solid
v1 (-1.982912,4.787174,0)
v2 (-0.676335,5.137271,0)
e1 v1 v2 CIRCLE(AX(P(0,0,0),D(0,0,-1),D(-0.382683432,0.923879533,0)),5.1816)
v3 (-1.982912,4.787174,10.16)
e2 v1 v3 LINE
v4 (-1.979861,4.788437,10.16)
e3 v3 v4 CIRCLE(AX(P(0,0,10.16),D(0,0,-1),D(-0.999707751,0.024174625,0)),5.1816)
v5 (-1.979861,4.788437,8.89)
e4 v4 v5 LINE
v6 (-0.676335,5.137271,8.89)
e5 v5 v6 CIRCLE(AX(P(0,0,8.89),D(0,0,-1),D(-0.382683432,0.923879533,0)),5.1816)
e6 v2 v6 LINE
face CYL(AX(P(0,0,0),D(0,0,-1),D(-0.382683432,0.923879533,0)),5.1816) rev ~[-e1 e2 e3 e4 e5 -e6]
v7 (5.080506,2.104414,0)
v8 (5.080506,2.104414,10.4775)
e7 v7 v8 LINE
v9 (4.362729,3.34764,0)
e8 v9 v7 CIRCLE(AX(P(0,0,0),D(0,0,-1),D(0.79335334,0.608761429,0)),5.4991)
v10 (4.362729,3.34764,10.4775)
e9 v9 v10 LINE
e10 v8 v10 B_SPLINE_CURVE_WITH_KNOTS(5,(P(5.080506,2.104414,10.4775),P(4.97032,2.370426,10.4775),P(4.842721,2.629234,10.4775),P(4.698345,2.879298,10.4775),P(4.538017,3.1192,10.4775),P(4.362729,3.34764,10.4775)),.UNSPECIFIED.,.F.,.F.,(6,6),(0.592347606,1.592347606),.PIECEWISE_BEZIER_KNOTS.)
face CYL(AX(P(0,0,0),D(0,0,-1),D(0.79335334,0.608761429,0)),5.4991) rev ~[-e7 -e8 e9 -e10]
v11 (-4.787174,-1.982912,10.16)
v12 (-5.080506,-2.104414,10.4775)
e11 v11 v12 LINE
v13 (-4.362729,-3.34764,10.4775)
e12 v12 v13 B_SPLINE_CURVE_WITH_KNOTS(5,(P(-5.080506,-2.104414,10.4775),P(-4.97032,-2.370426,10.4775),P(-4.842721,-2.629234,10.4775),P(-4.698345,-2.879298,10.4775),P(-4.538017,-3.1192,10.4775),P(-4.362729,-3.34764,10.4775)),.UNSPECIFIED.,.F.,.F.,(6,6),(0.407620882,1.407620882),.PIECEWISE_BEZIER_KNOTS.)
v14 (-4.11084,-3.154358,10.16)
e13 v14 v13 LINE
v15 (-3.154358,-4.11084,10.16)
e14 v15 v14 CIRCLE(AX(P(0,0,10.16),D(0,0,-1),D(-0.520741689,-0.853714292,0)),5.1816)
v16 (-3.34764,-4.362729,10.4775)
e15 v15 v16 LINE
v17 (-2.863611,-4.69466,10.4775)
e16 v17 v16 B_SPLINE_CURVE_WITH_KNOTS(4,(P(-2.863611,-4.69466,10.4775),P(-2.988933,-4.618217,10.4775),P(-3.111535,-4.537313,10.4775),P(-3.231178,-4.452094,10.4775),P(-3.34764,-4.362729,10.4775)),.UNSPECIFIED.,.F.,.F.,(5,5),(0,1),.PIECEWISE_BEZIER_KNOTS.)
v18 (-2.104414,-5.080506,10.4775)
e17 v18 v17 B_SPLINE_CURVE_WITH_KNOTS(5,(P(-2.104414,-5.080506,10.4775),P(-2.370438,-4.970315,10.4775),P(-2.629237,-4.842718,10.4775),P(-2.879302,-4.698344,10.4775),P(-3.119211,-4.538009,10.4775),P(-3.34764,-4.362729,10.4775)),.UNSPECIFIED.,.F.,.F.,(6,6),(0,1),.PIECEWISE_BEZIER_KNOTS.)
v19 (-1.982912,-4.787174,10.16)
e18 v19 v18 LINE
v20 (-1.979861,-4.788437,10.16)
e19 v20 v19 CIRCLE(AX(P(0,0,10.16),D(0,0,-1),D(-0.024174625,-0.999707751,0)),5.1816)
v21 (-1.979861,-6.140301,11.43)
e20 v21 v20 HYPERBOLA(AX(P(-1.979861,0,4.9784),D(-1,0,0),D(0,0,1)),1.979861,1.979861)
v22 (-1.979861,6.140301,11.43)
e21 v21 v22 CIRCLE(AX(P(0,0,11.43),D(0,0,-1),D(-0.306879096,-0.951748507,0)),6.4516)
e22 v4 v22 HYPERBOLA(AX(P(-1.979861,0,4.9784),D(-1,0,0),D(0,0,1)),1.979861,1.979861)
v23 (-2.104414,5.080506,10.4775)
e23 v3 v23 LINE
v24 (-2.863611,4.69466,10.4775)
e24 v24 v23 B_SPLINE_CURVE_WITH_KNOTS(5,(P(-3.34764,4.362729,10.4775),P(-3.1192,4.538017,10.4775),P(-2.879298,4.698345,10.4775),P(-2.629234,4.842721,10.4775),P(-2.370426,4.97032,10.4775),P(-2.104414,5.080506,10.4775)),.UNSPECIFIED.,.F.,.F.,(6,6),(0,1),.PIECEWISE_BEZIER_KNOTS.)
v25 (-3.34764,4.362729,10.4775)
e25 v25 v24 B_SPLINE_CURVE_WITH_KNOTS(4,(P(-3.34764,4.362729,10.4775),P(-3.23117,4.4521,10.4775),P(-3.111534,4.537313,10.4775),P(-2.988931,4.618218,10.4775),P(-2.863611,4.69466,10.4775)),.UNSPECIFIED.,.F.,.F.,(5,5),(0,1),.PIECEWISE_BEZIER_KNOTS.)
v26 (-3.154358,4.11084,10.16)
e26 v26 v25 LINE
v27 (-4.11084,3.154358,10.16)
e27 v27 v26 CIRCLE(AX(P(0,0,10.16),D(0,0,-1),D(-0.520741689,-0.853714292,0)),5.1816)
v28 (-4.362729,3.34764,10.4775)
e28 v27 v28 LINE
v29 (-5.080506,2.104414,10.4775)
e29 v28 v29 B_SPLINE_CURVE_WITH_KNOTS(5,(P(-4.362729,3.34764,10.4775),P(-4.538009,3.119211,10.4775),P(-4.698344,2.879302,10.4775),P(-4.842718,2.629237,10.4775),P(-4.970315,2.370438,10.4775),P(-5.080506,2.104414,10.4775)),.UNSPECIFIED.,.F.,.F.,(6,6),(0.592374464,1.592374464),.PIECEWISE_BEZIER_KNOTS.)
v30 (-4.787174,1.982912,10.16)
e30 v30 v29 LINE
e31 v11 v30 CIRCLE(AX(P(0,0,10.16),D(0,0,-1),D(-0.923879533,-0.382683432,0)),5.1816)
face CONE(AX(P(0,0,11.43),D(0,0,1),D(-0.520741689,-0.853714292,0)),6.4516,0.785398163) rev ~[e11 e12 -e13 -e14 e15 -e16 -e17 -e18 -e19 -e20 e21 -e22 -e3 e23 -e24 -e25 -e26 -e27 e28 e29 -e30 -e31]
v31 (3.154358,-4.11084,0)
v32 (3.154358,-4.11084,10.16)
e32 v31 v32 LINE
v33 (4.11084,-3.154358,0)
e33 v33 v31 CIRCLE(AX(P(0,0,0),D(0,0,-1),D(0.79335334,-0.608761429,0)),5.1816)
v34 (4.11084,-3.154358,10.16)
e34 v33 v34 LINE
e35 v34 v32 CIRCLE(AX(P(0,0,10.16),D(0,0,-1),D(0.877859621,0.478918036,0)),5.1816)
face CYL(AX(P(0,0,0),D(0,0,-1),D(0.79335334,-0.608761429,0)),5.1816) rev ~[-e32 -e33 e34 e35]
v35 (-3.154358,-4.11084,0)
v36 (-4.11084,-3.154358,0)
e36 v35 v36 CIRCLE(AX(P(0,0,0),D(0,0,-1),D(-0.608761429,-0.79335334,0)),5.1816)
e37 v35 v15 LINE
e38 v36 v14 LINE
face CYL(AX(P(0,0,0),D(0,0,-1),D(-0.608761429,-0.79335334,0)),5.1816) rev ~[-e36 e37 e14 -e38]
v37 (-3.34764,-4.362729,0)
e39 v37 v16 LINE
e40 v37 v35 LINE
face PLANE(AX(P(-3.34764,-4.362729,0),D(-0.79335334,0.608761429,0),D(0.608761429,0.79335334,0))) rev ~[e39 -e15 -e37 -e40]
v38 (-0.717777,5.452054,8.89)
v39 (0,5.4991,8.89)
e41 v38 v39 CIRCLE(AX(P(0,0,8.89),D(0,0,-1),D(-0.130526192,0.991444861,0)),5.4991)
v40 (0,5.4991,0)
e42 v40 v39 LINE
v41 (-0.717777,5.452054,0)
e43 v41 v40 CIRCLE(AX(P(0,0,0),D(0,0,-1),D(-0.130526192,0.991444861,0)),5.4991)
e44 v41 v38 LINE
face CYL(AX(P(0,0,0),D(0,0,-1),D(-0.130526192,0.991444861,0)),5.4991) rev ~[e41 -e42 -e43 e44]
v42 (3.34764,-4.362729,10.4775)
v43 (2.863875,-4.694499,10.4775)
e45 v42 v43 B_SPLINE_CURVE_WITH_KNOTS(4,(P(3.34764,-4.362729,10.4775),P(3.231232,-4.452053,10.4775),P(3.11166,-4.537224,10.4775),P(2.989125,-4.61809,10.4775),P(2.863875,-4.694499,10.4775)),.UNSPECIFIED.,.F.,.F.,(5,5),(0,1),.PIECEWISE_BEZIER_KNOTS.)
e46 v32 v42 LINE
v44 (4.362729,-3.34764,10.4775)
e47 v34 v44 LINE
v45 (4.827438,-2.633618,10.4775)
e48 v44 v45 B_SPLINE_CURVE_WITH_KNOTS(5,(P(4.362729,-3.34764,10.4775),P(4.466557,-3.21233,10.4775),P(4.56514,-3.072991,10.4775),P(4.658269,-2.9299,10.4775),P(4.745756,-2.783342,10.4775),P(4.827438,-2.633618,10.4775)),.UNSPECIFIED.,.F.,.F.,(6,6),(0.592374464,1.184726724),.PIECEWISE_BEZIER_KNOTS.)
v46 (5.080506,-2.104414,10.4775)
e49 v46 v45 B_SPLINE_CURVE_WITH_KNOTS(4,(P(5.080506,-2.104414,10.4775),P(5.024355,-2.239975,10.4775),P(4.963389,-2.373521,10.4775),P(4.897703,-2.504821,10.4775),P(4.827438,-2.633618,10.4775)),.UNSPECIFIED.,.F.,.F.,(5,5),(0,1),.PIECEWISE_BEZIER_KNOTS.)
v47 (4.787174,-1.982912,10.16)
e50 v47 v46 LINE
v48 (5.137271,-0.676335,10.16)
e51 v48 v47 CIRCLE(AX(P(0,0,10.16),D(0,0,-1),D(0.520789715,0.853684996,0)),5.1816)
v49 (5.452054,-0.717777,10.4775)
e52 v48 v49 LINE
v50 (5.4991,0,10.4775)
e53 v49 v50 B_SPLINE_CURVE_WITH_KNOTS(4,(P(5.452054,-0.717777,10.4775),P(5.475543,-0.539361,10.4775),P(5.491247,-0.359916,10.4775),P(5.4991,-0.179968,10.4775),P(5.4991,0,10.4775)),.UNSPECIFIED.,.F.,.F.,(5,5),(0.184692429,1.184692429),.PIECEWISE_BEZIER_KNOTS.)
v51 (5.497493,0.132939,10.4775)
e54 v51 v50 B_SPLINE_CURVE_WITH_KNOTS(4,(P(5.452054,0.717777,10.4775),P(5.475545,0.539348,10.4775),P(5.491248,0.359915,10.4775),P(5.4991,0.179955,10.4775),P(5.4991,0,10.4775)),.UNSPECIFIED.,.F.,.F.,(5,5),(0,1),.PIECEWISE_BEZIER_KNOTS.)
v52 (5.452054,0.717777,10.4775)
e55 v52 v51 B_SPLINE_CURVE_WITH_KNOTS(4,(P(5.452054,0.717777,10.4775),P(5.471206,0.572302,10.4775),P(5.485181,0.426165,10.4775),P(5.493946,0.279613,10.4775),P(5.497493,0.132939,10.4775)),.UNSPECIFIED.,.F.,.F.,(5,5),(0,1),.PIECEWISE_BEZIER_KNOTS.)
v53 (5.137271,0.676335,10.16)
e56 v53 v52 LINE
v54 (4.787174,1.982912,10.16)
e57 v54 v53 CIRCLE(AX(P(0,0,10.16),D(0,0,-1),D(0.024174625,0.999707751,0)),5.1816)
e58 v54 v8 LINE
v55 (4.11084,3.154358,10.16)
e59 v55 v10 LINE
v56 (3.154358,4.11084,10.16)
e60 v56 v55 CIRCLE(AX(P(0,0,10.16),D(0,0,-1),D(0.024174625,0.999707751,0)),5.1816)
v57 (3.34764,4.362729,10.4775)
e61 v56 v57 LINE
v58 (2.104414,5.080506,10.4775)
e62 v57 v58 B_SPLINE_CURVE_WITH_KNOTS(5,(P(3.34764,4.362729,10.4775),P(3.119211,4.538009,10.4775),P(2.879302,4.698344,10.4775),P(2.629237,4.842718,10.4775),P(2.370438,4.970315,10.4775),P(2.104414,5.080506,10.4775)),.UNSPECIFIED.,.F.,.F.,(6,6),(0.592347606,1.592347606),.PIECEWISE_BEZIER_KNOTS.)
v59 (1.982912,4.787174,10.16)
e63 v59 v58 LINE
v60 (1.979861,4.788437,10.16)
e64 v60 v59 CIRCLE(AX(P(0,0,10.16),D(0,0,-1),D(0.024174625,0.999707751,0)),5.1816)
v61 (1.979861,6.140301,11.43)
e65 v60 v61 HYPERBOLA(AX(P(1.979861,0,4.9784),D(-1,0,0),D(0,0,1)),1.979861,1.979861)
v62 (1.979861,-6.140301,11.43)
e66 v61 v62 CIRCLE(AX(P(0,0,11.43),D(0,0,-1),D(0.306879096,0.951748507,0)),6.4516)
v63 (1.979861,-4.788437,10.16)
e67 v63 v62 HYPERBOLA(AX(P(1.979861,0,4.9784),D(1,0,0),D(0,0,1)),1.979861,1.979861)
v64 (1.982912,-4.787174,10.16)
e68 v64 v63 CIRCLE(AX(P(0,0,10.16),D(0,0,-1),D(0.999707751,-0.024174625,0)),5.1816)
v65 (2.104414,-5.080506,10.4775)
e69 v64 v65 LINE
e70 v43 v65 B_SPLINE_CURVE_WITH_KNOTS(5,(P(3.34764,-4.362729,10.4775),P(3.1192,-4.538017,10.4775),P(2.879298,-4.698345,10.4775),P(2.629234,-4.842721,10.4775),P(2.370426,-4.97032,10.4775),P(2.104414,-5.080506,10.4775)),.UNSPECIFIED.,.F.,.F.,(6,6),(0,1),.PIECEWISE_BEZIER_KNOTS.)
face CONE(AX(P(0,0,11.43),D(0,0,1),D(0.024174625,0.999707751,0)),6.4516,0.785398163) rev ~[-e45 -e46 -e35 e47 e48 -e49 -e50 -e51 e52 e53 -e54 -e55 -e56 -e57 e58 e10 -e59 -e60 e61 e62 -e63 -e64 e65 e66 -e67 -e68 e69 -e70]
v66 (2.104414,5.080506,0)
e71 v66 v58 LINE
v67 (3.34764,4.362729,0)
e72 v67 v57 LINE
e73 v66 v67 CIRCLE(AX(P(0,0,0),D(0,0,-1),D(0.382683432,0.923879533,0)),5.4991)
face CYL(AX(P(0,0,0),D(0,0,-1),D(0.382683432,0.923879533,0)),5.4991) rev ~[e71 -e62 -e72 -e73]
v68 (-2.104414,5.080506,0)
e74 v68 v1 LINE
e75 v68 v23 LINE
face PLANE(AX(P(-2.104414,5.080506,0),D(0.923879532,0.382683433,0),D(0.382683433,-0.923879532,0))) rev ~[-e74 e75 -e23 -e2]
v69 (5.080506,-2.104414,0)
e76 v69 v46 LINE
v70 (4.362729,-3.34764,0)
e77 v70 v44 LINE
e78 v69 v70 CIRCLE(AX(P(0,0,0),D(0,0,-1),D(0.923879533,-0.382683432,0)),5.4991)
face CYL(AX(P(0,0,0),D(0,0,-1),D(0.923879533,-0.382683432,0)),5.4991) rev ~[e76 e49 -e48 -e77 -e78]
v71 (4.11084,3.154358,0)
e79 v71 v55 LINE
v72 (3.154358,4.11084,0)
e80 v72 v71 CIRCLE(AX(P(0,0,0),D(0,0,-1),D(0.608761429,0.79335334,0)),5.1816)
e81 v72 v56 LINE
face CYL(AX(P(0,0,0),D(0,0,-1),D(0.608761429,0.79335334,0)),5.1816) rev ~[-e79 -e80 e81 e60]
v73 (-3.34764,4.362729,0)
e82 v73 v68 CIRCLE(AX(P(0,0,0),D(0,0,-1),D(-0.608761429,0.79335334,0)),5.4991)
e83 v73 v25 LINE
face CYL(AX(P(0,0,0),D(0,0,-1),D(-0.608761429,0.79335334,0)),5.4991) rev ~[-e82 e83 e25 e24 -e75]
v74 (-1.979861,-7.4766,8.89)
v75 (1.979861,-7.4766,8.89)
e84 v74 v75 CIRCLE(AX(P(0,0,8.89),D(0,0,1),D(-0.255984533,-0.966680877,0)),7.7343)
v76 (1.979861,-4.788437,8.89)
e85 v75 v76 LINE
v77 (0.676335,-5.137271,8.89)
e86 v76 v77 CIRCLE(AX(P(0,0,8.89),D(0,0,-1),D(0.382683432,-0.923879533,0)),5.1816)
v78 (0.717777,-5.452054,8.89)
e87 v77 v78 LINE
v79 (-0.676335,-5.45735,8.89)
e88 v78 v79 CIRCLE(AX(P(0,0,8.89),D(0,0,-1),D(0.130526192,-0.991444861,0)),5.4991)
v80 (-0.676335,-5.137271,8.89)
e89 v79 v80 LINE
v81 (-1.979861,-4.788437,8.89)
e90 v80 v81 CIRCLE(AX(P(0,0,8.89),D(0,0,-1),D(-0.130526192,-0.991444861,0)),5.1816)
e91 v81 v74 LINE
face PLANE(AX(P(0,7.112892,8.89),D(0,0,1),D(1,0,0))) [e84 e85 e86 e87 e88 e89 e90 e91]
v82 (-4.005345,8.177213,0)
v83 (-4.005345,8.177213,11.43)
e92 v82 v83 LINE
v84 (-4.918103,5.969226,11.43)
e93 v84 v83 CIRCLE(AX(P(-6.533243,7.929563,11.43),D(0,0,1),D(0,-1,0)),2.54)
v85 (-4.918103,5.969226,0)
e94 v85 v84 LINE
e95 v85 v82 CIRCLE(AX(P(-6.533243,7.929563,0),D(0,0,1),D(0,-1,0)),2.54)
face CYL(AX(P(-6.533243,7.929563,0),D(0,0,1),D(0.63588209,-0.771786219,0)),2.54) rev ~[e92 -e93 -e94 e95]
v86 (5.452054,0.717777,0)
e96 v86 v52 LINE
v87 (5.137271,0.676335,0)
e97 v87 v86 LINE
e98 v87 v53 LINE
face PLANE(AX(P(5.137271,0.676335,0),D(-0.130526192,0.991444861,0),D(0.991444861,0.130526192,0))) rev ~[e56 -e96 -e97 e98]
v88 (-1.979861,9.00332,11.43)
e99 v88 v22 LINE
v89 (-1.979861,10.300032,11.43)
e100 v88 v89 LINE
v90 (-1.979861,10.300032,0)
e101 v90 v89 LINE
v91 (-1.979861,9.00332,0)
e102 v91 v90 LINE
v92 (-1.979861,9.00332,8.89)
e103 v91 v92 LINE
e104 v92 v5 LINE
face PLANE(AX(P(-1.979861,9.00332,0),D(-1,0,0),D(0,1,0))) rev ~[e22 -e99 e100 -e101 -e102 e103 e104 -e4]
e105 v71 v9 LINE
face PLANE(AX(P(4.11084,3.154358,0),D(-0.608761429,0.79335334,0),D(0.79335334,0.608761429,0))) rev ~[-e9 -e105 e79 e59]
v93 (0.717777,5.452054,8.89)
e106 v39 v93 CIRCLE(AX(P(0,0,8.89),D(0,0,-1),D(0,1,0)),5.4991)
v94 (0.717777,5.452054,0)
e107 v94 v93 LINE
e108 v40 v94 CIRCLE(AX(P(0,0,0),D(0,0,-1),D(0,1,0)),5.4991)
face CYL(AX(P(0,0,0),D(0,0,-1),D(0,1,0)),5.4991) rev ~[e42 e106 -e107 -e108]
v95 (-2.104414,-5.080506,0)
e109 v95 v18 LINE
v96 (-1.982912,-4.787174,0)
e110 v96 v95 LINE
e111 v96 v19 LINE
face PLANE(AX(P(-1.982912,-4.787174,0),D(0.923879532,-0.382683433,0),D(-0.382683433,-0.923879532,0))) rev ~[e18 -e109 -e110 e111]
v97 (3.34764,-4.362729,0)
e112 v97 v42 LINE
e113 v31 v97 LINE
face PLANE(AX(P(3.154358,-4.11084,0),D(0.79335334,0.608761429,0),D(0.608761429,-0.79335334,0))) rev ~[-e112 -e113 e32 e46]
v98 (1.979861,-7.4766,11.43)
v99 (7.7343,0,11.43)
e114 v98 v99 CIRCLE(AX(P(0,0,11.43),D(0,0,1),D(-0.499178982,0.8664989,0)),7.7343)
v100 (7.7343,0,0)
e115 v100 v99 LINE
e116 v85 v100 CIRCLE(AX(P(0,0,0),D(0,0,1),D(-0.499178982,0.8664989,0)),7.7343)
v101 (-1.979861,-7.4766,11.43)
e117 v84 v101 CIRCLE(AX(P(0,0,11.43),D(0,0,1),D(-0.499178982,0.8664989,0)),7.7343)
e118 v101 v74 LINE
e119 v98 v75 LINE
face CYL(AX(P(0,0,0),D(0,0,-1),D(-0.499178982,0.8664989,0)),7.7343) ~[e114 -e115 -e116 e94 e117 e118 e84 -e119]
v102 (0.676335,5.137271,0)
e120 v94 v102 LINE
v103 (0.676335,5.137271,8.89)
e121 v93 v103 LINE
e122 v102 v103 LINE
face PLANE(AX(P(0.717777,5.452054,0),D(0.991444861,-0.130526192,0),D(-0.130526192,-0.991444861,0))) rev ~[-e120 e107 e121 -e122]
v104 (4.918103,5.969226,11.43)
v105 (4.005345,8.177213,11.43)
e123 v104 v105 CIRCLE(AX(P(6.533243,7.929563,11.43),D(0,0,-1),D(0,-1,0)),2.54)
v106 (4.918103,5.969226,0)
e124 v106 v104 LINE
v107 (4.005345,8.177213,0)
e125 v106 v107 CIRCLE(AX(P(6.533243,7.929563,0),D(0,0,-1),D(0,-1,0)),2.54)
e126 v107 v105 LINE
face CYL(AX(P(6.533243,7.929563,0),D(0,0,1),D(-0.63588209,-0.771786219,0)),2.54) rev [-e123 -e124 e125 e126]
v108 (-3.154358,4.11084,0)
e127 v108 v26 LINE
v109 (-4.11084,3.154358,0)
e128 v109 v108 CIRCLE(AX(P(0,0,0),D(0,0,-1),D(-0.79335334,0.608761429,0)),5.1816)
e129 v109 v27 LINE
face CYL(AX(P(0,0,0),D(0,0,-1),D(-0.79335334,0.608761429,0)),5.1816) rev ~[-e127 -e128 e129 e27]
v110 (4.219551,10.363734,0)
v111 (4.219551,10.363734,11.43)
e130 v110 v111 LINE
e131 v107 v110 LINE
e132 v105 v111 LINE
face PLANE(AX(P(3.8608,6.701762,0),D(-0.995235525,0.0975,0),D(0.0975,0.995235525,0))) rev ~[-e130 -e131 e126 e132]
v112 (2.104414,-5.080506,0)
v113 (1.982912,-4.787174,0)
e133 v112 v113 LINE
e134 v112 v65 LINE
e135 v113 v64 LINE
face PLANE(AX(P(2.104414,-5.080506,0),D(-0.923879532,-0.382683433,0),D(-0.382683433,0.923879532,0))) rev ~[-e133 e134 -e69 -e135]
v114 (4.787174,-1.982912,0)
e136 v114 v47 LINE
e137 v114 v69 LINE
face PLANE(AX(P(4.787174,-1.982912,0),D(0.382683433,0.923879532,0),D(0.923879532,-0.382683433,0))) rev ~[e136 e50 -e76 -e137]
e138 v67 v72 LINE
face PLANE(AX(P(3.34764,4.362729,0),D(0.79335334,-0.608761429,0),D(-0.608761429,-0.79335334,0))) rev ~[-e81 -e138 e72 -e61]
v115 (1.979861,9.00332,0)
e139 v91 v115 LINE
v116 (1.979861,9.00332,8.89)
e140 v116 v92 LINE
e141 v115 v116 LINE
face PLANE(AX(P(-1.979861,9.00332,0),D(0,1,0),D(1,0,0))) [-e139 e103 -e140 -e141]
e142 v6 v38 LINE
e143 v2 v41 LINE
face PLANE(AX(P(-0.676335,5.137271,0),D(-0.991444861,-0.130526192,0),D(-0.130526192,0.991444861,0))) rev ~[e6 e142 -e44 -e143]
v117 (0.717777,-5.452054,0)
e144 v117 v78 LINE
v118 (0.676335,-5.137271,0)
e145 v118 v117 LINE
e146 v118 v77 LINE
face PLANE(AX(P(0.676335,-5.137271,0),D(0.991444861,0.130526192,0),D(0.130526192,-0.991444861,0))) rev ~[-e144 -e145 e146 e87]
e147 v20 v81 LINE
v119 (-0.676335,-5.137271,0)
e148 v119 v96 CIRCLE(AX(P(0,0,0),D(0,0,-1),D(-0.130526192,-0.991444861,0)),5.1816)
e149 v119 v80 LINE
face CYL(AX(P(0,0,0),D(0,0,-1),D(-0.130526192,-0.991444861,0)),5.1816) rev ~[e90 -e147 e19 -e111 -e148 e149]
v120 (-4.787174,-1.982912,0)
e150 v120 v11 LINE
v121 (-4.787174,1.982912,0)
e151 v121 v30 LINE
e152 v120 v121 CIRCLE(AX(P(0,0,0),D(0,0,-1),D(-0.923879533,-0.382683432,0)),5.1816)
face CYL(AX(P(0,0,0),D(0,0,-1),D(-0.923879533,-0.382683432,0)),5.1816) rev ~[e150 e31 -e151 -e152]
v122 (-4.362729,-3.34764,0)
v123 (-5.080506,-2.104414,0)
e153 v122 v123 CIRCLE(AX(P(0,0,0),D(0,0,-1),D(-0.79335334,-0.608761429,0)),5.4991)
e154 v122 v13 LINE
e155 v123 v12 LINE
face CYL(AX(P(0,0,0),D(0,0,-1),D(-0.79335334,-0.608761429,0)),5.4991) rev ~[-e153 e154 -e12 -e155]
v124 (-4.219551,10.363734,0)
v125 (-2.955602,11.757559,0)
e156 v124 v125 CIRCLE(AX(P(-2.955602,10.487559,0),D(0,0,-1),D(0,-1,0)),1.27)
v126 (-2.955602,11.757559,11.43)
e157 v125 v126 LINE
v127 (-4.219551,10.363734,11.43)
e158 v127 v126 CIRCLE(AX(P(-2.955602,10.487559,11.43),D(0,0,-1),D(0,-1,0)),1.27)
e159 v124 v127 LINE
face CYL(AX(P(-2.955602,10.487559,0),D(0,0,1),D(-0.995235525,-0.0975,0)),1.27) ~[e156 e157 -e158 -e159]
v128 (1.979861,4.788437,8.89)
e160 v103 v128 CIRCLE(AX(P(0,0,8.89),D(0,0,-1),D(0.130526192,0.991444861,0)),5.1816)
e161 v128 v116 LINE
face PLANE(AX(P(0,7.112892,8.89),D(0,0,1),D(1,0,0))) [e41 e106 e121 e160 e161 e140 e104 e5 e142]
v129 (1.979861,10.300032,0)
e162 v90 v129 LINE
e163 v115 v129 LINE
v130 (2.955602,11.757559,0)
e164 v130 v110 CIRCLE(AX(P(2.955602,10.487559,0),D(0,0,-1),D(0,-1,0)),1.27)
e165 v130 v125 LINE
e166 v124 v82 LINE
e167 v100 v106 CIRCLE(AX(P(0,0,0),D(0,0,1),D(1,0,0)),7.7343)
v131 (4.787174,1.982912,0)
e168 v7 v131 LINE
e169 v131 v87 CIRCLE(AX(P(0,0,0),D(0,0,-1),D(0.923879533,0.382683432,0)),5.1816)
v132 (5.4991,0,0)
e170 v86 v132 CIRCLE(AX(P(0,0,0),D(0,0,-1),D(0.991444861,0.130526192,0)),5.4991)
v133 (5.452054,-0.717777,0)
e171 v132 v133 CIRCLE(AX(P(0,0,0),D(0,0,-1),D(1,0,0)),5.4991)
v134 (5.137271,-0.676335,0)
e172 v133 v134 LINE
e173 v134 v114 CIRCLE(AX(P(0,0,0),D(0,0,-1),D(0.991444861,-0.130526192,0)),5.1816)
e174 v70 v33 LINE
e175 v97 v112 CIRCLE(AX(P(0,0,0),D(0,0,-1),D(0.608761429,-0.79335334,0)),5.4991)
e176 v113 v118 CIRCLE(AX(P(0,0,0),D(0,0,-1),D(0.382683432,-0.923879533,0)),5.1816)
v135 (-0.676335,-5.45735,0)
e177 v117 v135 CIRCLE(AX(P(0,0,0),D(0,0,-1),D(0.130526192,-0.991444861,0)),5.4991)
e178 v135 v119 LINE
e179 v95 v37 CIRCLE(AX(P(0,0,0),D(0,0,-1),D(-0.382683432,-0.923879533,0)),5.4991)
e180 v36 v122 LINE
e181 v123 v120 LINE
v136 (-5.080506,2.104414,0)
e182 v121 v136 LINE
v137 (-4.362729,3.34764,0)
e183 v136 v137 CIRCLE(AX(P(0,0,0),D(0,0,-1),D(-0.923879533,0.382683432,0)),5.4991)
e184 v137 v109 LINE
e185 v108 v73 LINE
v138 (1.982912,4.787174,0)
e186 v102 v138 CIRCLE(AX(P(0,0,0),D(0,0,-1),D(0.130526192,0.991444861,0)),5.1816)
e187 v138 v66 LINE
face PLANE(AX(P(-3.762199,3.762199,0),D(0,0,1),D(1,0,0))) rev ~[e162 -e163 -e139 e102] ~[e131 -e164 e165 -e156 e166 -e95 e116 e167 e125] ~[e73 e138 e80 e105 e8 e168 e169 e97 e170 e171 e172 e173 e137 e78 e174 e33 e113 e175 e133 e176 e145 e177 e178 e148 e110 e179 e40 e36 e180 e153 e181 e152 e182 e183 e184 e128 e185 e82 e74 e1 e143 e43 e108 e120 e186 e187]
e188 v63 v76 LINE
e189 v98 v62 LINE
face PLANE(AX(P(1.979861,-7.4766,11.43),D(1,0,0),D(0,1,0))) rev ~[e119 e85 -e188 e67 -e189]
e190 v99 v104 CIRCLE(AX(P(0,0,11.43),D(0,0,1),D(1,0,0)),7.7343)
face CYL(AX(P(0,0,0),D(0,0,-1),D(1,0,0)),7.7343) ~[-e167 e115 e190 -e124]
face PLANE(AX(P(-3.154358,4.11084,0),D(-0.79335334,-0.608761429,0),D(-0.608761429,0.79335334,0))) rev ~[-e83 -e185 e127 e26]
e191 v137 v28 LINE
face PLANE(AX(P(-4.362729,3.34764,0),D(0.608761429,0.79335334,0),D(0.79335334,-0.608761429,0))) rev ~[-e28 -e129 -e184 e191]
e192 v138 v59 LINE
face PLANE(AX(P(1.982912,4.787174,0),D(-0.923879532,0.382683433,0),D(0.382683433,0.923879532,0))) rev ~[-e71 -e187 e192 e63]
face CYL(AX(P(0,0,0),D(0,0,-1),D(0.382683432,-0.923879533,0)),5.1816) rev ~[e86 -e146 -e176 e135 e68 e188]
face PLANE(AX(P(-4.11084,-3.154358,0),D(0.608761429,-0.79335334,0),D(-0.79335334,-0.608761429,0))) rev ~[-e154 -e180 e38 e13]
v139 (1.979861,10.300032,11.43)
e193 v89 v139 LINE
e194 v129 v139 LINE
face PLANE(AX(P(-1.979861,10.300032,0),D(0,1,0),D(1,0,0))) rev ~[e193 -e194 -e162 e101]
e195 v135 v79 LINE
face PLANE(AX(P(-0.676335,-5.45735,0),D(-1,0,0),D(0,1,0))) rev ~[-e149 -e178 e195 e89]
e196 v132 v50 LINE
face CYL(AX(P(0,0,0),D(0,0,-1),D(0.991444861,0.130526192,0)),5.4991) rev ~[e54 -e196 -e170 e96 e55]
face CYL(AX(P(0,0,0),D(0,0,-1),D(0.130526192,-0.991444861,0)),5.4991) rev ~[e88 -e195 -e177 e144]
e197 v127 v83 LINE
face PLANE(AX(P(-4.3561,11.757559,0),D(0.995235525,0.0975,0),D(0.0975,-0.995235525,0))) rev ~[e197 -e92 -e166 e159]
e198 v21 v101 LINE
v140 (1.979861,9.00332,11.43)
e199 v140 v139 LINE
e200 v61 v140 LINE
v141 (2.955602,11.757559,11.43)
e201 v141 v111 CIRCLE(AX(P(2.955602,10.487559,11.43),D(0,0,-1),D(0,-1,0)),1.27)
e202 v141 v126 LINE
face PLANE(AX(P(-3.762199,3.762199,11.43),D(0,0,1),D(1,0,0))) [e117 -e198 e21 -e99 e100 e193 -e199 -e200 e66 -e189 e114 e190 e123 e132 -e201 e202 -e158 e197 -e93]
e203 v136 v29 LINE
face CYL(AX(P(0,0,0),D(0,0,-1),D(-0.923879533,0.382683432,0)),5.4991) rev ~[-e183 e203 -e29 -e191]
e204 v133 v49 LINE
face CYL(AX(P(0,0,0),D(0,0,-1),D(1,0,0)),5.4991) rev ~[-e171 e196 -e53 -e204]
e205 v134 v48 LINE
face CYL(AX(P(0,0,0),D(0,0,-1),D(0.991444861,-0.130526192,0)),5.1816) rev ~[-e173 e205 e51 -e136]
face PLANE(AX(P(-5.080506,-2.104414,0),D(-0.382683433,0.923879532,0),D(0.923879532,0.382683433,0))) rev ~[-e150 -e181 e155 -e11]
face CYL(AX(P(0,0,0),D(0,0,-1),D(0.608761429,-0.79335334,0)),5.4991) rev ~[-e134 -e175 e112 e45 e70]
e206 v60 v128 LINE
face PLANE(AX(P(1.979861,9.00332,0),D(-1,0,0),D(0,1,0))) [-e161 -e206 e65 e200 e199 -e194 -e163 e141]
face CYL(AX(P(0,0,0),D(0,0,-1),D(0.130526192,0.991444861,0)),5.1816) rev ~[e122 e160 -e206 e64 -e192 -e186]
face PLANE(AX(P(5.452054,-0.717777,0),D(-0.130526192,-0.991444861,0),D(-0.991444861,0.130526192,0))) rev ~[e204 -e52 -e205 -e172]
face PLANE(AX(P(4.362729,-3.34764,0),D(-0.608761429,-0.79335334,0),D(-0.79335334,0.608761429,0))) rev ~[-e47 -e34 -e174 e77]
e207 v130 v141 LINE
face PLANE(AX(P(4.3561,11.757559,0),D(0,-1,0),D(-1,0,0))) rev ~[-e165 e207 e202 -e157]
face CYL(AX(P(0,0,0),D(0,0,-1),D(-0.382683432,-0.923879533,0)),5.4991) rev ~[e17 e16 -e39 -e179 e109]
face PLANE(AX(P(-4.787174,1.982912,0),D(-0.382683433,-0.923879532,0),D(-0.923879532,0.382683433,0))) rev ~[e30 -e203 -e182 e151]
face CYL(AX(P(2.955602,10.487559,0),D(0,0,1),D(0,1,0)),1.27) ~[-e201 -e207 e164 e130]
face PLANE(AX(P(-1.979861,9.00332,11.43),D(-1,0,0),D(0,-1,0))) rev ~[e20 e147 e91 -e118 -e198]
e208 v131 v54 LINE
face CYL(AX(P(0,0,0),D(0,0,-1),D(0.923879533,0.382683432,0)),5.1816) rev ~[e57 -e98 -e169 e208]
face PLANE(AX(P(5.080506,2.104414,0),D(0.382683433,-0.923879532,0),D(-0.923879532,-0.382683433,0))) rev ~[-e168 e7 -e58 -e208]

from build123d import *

# Parameters (mm, degrees)
F0_W         = 3.9597223513
F0_H         = 1.2967120856
F1_DEPTH     = 11.43
F2_R         = 2.54
F4_DEPTH     = 11.43
F5_DEPTH     = 2.54
F6_T2_ANGLE  = 117.2359685867
F6_T4_ANGLE  = 87.2295221482
F6_T6_ANGLE  = 87.2295221482
F6_T8_ANGLE  = 87.2295221482
F6_T10_ANGLE = 87.2295221482
F6_T12_ANGLE = 87.2295221482
F6_T14_ANGLE = 87.2295221482
F6_T16_ANGLE = 72.2652313511
F6_T18_ANGLE = 72.2652313511
F6_T20_ANGLE = 72.2652313511
F6_T22_ANGLE = 72.2652313511
F7_R         = 1.27


# Not quite as in the source:
# - a fillet or chamfer that OpenCascade refuses, or shapes differently, is made with other operations: its cross-section is extruded or revolved along the edge and cut away or added
# - a feature names something its author has since deleted; it is built from what else it names


with BuildPart() as f1:
    # F0 (on Top) → F1 (new body)
    with BuildSketch(Plane.XY):
        with BuildLine():
            ThreePointArc((-3.8608, 6.7017624436), (-3.8703236977, -6.6962669425), (7.7343, 0))
            ThreePointArc((7.7343, 0), (6.6962669425, 3.8703236977), (3.8608, 6.7017624436))
            ThreePointArc((3.8608, 6.7017624436), (1.9982436316, 7.4717078957), (0, 7.7343))
            ThreePointArc((0, 7.7343), (-1.9982436316, 7.4717078957), (-3.8608, 6.7017624436))
        make_face()
        with BuildLine():
            ThreePointArc((-0.7177765836, 5.4520544372), (-0.3596583479, 5.4873260048), (0, 5.4991))
            ThreePointArc((0, 5.4991), (0.3596583479, 5.4873260048), (0.7177765836, 5.4520544372))
            ThreePointArc((0.7177765836, 5.4520544372), (1.4232718109, 5.3117227113), (2.1044144629, 5.0805059372))
            ThreePointArc((2.1044144629, 5.0805059372), (2.74955, 4.762360298), (3.3476399743, 4.3627293536))
            ThreePointArc((3.3476399743, 4.3627293536), (3.8884509004, 3.8884509004), (4.3627293536, 3.3476399743))
            ThreePointArc((4.3627293536, 3.3476399743), (4.762360298, 2.74955), (5.0805059372, 2.1044144629))
            ThreePointArc((5.0805059372, 2.1044144629), (5.3117227113, 1.4232718109), (5.4520544372, 0.7177765836))
            ThreePointArc((5.4520544372, 0.7177765836), (5.4873260048, 0.3596583479), (5.4991, 0))
            ThreePointArc((5.4991, 0), (5.4873260048, -0.3596583479), (5.4520544372, -0.7177765836))
            ThreePointArc((5.4520544372, -0.7177765836), (5.3117227113, -1.4232718109), (5.0805059372, -2.1044144629))
            ThreePointArc((5.0805059372, -2.1044144629), (4.762360298, -2.74955), (4.3627293536, -3.3476399743))
            ThreePointArc((4.3627293536, -3.3476399743), (3.8884509004, -3.8884509004), (3.3476399743, -4.3627293536))
            ThreePointArc((3.3476399743, -4.3627293536), (2.74955, -4.762360298), (2.1044144629, -5.0805059372))
            ThreePointArc((2.1044144629, -5.0805059372), (1.4232718109, -5.3117227113), (0.7177765836, -5.4520544372))
            ThreePointArc((0.7177765836, -5.4520544372), (0.0208895376, -5.4990603231), (-0.6763345176, -5.4573503122))
            ThreePointArc((-0.6763345176, -5.4573503122), (-1.4030837979, -5.3170909966), (-2.1044144629, -5.0805059372))
            ThreePointArc((-2.1044144629, -5.0805059372), (-2.74955, -4.762360298), (-3.3476399743, -4.3627293536))
            ThreePointArc((-3.3476399743, -4.3627293536), (-3.8884509004, -3.8884509004), (-4.3627293536, -3.3476399743))
            ThreePointArc((-4.3627293536, -3.3476399743), (-4.762360298, -2.74955), (-5.0805059372, -2.1044144629))
            ThreePointArc((-5.0805059372, -2.1044144629), (-5.4991, 0), (-5.0805059372, 2.1044144629))
            ThreePointArc((-5.0805059372, 2.1044144629), (-4.762360298, 2.74955), (-4.3627293536, 3.3476399743))
            ThreePointArc((-4.3627293536, 3.3476399743), (-3.8884509004, 3.8884509004), (-3.3476399743, 4.3627293536))
            ThreePointArc((-3.3476399743, 4.3627293536), (-2.74955, 4.762360298), (-2.1044144629, 5.0805059372))
            ThreePointArc((-2.1044144629, 5.0805059372), (-1.4232718109, 5.3117227113), (-0.7177765836, 5.4520544372))
        make_face(mode=Mode.SUBTRACT)
        with BuildLine():
            ThreePointArc((0, 7.7343), (1.9982436316, 7.4717078957), (3.8608, 6.7017624436))
            Line((3.8608, 6.7017624436), (4.3561, 11.75755891))
            Line((4.3561, 11.75755891), (-4.3561, 11.75755891))
            Line((-4.3561, 11.75755891), (-3.8608, 6.7017624436))
            ThreePointArc((-3.8608, 6.7017624436), (-1.9982436316, 7.4717078957), (0, 7.7343))
        make_face()
        with Locations((0, 9.6516758204)):
            Rectangle(F0_W, F0_H, mode=Mode.SUBTRACT)
    extrude(amount=F1_DEPTH)

    # F2
    f2_edges = [f1.edges().sort_by_distance(p)[0] for p in [
        (3.8608, 6.701762, 5.715),
        (-3.8608, 6.701762, 5.715),
    ]]
    fillet(f2_edges, radius=F2_R)

    # F0 (on Top) → F4 (join)
    with BuildSketch(Plane.XY):
        with BuildLine():
            Line((-4.3627293536, 3.3476399743), (-4.1108396681, 3.1543582206))
            ThreePointArc((-4.1108396681, 3.1543582206), (-3.6639444974, 3.6639444974), (-3.1543582206, 4.1108396681))
            Line((-3.1543582206, 4.1108396681), (-3.3476399743, 4.3627293536))
            ThreePointArc((-3.3476399743, 4.3627293536), (-3.8884509004, 3.8884509004), (-4.3627293536, 3.3476399743))
        make_face()
        with BuildLine():
            Line((-0.6763345176, 5.1372706937), (-0.7177765836, 5.4520544372))
            ThreePointArc((-0.7177765836, 5.4520544372), (-1.4232718109, 5.3117227113), (-2.1044144629, 5.0805059372))
            Line((-2.1044144629, 5.0805059372), (-1.9829124731, 4.7871741857))
            ThreePointArc((-1.9829124731, 4.7871741857), (-1.3410967641, 5.0050412615), (-0.6763345176, 5.1372706937))
        make_face()
        with BuildLine():
            ThreePointArc((2.1044144629, 5.0805059372), (1.4232718109, 5.3117227113), (0.7177765836, 5.4520544372))
            Line((0.7177765836, 5.4520544372), (0.6763345176, 5.1372706937))
            ThreePointArc((0.6763345176, 5.1372706937), (1.3410967641, 5.0050412615), (1.9829124731, 4.7871741857))
            Line((1.9829124731, 4.7871741857), (2.1044144629, 5.0805059372))
        make_face()
        with BuildLine():
            Line((3.3476399743, 4.3627293536), (3.1543582206, 4.1108396681))
            ThreePointArc((3.1543582206, 4.1108396681), (3.6639444974, 3.6639444974), (4.1108396681, 3.1543582206))
            Line((4.1108396681, 3.1543582206), (4.3627293536, 3.3476399743))
            ThreePointArc((4.3627293536, 3.3476399743), (3.8884509004, 3.8884509004), (3.3476399743, 4.3627293536))
        make_face()
        with BuildLine():
            ThreePointArc((4.7871741857, 1.9829124731), (5.0050412615, 1.3410967641), (5.1372706937, 0.6763345176))
            Line((5.1372706937, 0.6763345176), (5.4520544372, 0.7177765836))
            ThreePointArc((5.4520544372, 0.7177765836), (5.3117227113, 1.4232718109), (5.0805059372, 2.1044144629))
            Line((5.0805059372, 2.1044144629), (4.7871741857, 1.9829124731))
        make_face()
        with BuildLine():
            ThreePointArc((-4.7871741857, -1.9829124731), (-5.1816, 0), (-4.7871741857, 1.9829124731))
            Line((-4.7871741857, 1.9829124731), (-5.0805059372, 2.1044144629))
            ThreePointArc((-5.0805059372, 2.1044144629), (-5.4991, 0), (-5.0805059372, -2.1044144629))
            Line((-5.0805059372, -2.1044144629), (-4.7871741857, -1.9829124731))
        make_face()
        with BuildLine():
            ThreePointArc((-3.1543582206, -4.1108396681), (-3.6639444974, -3.6639444974), (-4.1108396681, -3.1543582206))
            Line((-4.1108396681, -3.1543582206), (-4.3627293536, -3.3476399743))
            ThreePointArc((-4.3627293536, -3.3476399743), (-3.8884509004, -3.8884509004), (-3.3476399743, -4.3627293536))
            Line((-3.3476399743, -4.3627293536), (-3.1543582206, -4.1108396681))
        make_face()
        with BuildLine():
            ThreePointArc((-0.6763345176, -5.1372706937), (-1.3410967641, -5.0050412615), (-1.9829124731, -4.7871741857))
            Line((-1.9829124731, -4.7871741857), (-2.1044144629, -5.0805059372))
            ThreePointArc((-2.1044144629, -5.0805059372), (-1.4030837979, -5.3170909966), (-0.6763345176, -5.4573503122))
            Line((-0.6763345176, -5.4573503122), (-0.6763345176, -5.1372706937))
        make_face()
        with BuildLine():
            ThreePointArc((1.9829124731, -4.7871741857), (1.3410967641, -5.0050412615), (0.6763345176, -5.1372706937))
            Line((0.6763345176, -5.1372706937), (0.7177765836, -5.4520544372))
            ThreePointArc((0.7177765836, -5.4520544372), (1.4232718109, -5.3117227113), (2.1044144629, -5.0805059372))
            Line((2.1044144629, -5.0805059372), (1.9829124731, -4.7871741857))
        make_face()
        with BuildLine():
            ThreePointArc((4.1108396681, -3.1543582206), (3.6639444974, -3.6639444974), (3.1543582206, -4.1108396681))
            Line((3.1543582206, -4.1108396681), (3.3476399743, -4.3627293536))
            ThreePointArc((3.3476399743, -4.3627293536), (3.8884509004, -3.8884509004), (4.3627293536, -3.3476399743))
            Line((4.3627293536, -3.3476399743), (4.1108396681, -3.1543582206))
        make_face()
        with BuildLine():
            ThreePointArc((5.1372706937, -0.6763345176), (5.0050412615, -1.3410967641), (4.7871741857, -1.9829124731))
            Line((4.7871741857, -1.9829124731), (5.0805059372, -2.1044144629))
            ThreePointArc((5.0805059372, -2.1044144629), (5.3117227113, -1.4232718109), (5.4520544372, -0.7177765836))
            Line((5.4520544372, -0.7177765836), (5.1372706937, -0.6763345176))
        make_face()
    extrude(amount=F4_DEPTH)

    # F3 (on face) → F5 (cut)
    with BuildSketch(Plane.XY.offset(11.43)):
        with BuildLine():
            Line((1.9798611756, 5.1303265525), (1.9798611756, 9.0033197775))
            Line((1.9798611756, 9.0033197775), (-1.9798611756, 9.0033197775))
            Line((-1.9798611756, 9.0033197775), (-1.9798611756, 5.1303265525))
            ThreePointArc((-1.9798611756, 5.1303265525), (0, 5.4991), (1.9798611756, 5.1303265525))
        make_face()
        with BuildLine():
            Line((1.9798611756, -5.1303265525), (1.9798611756, 5.1303265525))
            ThreePointArc((1.9798611756, 5.1303265525), (0, 5.4991), (-1.9798611756, 5.1303265525))
            Line((-1.9798611756, 5.1303265525), (-1.9798611756, -5.1303265525))
            ThreePointArc((-1.9798611756, -5.1303265525), (0, -5.4991), (1.9798611756, -5.1303265525))
        make_face()
        with BuildLine():
            Line((1.9798611756, -7.4765999101), (1.9798611756, -5.1303265525))
            ThreePointArc((1.9798611756, -5.1303265525), (0, -5.4991), (-1.9798611756, -5.1303265525))
            Line((-1.9798611756, -5.1303265525), (-1.9798611756, -7.4765999101))
            ThreePointArc((-1.9798611756, -7.4765999101), (0, -7.7343), (1.9798611756, -7.4765999101))
        make_face()
    extrude(amount=-F5_DEPTH, mode=Mode.SUBTRACT)

    # F6: chamfer of 1.27 on 11 edges, made by hand

    # F6_s1 → F6_t2 (revolve, cut)
    with BuildSketch(Plane(origin=(0, 0, 0), x_dir=(0, 0, 1), z_dir=(0.8537142924, -0.5207416893, 0))):
        Polygon((11.43, 6.4516), (10.16, 5.1816), (11.43, 5.1816), align=None)
    revolve(axis=Axis((0, 0, 11.43), (0, 0, -1)), revolution_arc=F6_T2_ANGLE, mode=Mode.SUBTRACT)

    # F6_s3 → F6_t4 (revolve, cut)
    with BuildSketch(Plane(origin=(0, 0, 0), x_dir=(0, 0, 1), z_dir=(0.9997077511, -0.0241746249, 0))):
        Polygon((11.43, 6.4516), (10.16, 5.1816), (11.43, 5.1816), align=None)
    revolve(axis=Axis((0, 0, 11.43), (0, 0, -1)), revolution_arc=F6_T4_ANGLE, mode=Mode.SUBTRACT)

    # F6_s5 → F6_t6 (revolve, cut)
    with BuildSketch(Plane(origin=(0, 0, 0), x_dir=(0, 0, 1), z_dir=(-0.0241746249, -0.9997077511, 0))):
        Polygon((11.43, 6.4516), (10.16, 5.1816), (11.43, 5.1816), align=None)
    revolve(axis=Axis((0, 0, 11.43), (0, 0, -1)), revolution_arc=F6_T6_ANGLE, mode=Mode.SUBTRACT)

    # F6_s7 → F6_t8 (revolve, cut)
    with BuildSketch(Plane(origin=(0, 0, 0), x_dir=(0, 0, 1), z_dir=(-0.9997077511, 0.0241746249, 0))):
        Polygon((11.43, 6.4516), (10.16, 5.1816), (11.43, 5.1816), align=None)
    revolve(axis=Axis((0, 0, 11.43), (0, 0, -1)), revolution_arc=F6_T8_ANGLE, mode=Mode.SUBTRACT)

    # F6_s9 → F6_t10 (revolve, cut)
    with BuildSketch(Plane(origin=(0, 0, 0), x_dir=(0, 0, 1), z_dir=(-0.8536849963, 0.5207897148, 0))):
        Polygon((11.43, 6.4516), (10.16, 5.1816), (11.43, 5.1816), align=None)
    revolve(axis=Axis((0, 0, 11.43), (0, 0, -1)), revolution_arc=F6_T10_ANGLE, mode=Mode.SUBTRACT)

    # F6_s11 → F6_t12 (revolve, cut)
    with BuildSketch(Plane(origin=(0, 0, 0), x_dir=(0, 0, 1), z_dir=(-0.4789180362, 0.8778596212, 0))):
        Polygon((11.43, 6.4516), (10.16, 5.1816), (11.43, 5.1816), align=None)
    revolve(axis=Axis((0, 0, 11.43), (0, 0, -1)), revolution_arc=F6_T12_ANGLE, mode=Mode.SUBTRACT)

    # F6_s13 → F6_t14 (revolve, cut)
    with BuildSketch(Plane(origin=(0, 0, 0), x_dir=(0, 0, 1), z_dir=(0.0241746249, 0.9997077511, 0))):
        Polygon((11.43, 6.4516), (10.16, 5.1816), (11.43, 5.1816), align=None)
    revolve(axis=Axis((0, 0, 11.43), (0, 0, -1)), revolution_arc=F6_T14_ANGLE, mode=Mode.SUBTRACT)

    # F6_s15 → F6_t16 (revolve, cut)
    with BuildSketch(Plane(origin=(0, 0, 0), x_dir=(0, 0, 1), z_dir=(0.9717518339, 0.2360050283, 0))):
        Polygon((11.43, 6.4516), (10.16, 5.1816), (11.43, 5.1816), align=None)
    revolve(axis=Axis((0, 0, 11.43), (0, 0, -1)), revolution_arc=F6_T16_ANGLE, mode=Mode.SUBTRACT)

    # F6_s17 → F6_t18 (revolve, cut)
    with BuildSketch(Plane(origin=(0, 0, 0), x_dir=(0, 0, 1), z_dir=(-0.5207957174, -0.8536813344, 0))):
        Polygon((11.43, 6.4516), (10.16, 5.1816), (11.43, 5.1816), align=None)
    revolve(axis=Axis((0, 0, 11.43), (0, 0, -1)), revolution_arc=F6_T18_ANGLE, mode=Mode.SUBTRACT)

    # F6_s19 → F6_t20 (revolve, cut)
    with BuildSketch(Plane(origin=(0, 0, 0), x_dir=(0, 0, 1), z_dir=(-0.9717518339, -0.2360050283, 0))):
        Polygon((11.43, 6.4516), (10.16, 5.1816), (11.43, 5.1816), align=None)
    revolve(axis=Axis((0, 0, 11.43), (0, 0, -1)), revolution_arc=F6_T20_ANGLE, mode=Mode.SUBTRACT)

    # F6_s21 → F6_t22 (revolve, cut)
    with BuildSketch(Plane(origin=(0, 0, 0), x_dir=(0, 0, 1), z_dir=(0.5207957174, 0.8536813344, 0))):
        Polygon((11.43, 6.4516), (10.16, 5.1816), (11.43, 5.1816), align=None)
    revolve(axis=Axis((0, 0, 11.43), (0, 0, -1)), revolution_arc=F6_T22_ANGLE, mode=Mode.SUBTRACT)

    # F7
    f7_edges = [f1.edges().sort_by_distance(p)[0] for p in [
        (-4.3561, 11.757559, 5.715),
        (4.3561, 11.757559, 5.715),
    ]]
    fillet(f7_edges, radius=F7_R)


solid = f1.part
